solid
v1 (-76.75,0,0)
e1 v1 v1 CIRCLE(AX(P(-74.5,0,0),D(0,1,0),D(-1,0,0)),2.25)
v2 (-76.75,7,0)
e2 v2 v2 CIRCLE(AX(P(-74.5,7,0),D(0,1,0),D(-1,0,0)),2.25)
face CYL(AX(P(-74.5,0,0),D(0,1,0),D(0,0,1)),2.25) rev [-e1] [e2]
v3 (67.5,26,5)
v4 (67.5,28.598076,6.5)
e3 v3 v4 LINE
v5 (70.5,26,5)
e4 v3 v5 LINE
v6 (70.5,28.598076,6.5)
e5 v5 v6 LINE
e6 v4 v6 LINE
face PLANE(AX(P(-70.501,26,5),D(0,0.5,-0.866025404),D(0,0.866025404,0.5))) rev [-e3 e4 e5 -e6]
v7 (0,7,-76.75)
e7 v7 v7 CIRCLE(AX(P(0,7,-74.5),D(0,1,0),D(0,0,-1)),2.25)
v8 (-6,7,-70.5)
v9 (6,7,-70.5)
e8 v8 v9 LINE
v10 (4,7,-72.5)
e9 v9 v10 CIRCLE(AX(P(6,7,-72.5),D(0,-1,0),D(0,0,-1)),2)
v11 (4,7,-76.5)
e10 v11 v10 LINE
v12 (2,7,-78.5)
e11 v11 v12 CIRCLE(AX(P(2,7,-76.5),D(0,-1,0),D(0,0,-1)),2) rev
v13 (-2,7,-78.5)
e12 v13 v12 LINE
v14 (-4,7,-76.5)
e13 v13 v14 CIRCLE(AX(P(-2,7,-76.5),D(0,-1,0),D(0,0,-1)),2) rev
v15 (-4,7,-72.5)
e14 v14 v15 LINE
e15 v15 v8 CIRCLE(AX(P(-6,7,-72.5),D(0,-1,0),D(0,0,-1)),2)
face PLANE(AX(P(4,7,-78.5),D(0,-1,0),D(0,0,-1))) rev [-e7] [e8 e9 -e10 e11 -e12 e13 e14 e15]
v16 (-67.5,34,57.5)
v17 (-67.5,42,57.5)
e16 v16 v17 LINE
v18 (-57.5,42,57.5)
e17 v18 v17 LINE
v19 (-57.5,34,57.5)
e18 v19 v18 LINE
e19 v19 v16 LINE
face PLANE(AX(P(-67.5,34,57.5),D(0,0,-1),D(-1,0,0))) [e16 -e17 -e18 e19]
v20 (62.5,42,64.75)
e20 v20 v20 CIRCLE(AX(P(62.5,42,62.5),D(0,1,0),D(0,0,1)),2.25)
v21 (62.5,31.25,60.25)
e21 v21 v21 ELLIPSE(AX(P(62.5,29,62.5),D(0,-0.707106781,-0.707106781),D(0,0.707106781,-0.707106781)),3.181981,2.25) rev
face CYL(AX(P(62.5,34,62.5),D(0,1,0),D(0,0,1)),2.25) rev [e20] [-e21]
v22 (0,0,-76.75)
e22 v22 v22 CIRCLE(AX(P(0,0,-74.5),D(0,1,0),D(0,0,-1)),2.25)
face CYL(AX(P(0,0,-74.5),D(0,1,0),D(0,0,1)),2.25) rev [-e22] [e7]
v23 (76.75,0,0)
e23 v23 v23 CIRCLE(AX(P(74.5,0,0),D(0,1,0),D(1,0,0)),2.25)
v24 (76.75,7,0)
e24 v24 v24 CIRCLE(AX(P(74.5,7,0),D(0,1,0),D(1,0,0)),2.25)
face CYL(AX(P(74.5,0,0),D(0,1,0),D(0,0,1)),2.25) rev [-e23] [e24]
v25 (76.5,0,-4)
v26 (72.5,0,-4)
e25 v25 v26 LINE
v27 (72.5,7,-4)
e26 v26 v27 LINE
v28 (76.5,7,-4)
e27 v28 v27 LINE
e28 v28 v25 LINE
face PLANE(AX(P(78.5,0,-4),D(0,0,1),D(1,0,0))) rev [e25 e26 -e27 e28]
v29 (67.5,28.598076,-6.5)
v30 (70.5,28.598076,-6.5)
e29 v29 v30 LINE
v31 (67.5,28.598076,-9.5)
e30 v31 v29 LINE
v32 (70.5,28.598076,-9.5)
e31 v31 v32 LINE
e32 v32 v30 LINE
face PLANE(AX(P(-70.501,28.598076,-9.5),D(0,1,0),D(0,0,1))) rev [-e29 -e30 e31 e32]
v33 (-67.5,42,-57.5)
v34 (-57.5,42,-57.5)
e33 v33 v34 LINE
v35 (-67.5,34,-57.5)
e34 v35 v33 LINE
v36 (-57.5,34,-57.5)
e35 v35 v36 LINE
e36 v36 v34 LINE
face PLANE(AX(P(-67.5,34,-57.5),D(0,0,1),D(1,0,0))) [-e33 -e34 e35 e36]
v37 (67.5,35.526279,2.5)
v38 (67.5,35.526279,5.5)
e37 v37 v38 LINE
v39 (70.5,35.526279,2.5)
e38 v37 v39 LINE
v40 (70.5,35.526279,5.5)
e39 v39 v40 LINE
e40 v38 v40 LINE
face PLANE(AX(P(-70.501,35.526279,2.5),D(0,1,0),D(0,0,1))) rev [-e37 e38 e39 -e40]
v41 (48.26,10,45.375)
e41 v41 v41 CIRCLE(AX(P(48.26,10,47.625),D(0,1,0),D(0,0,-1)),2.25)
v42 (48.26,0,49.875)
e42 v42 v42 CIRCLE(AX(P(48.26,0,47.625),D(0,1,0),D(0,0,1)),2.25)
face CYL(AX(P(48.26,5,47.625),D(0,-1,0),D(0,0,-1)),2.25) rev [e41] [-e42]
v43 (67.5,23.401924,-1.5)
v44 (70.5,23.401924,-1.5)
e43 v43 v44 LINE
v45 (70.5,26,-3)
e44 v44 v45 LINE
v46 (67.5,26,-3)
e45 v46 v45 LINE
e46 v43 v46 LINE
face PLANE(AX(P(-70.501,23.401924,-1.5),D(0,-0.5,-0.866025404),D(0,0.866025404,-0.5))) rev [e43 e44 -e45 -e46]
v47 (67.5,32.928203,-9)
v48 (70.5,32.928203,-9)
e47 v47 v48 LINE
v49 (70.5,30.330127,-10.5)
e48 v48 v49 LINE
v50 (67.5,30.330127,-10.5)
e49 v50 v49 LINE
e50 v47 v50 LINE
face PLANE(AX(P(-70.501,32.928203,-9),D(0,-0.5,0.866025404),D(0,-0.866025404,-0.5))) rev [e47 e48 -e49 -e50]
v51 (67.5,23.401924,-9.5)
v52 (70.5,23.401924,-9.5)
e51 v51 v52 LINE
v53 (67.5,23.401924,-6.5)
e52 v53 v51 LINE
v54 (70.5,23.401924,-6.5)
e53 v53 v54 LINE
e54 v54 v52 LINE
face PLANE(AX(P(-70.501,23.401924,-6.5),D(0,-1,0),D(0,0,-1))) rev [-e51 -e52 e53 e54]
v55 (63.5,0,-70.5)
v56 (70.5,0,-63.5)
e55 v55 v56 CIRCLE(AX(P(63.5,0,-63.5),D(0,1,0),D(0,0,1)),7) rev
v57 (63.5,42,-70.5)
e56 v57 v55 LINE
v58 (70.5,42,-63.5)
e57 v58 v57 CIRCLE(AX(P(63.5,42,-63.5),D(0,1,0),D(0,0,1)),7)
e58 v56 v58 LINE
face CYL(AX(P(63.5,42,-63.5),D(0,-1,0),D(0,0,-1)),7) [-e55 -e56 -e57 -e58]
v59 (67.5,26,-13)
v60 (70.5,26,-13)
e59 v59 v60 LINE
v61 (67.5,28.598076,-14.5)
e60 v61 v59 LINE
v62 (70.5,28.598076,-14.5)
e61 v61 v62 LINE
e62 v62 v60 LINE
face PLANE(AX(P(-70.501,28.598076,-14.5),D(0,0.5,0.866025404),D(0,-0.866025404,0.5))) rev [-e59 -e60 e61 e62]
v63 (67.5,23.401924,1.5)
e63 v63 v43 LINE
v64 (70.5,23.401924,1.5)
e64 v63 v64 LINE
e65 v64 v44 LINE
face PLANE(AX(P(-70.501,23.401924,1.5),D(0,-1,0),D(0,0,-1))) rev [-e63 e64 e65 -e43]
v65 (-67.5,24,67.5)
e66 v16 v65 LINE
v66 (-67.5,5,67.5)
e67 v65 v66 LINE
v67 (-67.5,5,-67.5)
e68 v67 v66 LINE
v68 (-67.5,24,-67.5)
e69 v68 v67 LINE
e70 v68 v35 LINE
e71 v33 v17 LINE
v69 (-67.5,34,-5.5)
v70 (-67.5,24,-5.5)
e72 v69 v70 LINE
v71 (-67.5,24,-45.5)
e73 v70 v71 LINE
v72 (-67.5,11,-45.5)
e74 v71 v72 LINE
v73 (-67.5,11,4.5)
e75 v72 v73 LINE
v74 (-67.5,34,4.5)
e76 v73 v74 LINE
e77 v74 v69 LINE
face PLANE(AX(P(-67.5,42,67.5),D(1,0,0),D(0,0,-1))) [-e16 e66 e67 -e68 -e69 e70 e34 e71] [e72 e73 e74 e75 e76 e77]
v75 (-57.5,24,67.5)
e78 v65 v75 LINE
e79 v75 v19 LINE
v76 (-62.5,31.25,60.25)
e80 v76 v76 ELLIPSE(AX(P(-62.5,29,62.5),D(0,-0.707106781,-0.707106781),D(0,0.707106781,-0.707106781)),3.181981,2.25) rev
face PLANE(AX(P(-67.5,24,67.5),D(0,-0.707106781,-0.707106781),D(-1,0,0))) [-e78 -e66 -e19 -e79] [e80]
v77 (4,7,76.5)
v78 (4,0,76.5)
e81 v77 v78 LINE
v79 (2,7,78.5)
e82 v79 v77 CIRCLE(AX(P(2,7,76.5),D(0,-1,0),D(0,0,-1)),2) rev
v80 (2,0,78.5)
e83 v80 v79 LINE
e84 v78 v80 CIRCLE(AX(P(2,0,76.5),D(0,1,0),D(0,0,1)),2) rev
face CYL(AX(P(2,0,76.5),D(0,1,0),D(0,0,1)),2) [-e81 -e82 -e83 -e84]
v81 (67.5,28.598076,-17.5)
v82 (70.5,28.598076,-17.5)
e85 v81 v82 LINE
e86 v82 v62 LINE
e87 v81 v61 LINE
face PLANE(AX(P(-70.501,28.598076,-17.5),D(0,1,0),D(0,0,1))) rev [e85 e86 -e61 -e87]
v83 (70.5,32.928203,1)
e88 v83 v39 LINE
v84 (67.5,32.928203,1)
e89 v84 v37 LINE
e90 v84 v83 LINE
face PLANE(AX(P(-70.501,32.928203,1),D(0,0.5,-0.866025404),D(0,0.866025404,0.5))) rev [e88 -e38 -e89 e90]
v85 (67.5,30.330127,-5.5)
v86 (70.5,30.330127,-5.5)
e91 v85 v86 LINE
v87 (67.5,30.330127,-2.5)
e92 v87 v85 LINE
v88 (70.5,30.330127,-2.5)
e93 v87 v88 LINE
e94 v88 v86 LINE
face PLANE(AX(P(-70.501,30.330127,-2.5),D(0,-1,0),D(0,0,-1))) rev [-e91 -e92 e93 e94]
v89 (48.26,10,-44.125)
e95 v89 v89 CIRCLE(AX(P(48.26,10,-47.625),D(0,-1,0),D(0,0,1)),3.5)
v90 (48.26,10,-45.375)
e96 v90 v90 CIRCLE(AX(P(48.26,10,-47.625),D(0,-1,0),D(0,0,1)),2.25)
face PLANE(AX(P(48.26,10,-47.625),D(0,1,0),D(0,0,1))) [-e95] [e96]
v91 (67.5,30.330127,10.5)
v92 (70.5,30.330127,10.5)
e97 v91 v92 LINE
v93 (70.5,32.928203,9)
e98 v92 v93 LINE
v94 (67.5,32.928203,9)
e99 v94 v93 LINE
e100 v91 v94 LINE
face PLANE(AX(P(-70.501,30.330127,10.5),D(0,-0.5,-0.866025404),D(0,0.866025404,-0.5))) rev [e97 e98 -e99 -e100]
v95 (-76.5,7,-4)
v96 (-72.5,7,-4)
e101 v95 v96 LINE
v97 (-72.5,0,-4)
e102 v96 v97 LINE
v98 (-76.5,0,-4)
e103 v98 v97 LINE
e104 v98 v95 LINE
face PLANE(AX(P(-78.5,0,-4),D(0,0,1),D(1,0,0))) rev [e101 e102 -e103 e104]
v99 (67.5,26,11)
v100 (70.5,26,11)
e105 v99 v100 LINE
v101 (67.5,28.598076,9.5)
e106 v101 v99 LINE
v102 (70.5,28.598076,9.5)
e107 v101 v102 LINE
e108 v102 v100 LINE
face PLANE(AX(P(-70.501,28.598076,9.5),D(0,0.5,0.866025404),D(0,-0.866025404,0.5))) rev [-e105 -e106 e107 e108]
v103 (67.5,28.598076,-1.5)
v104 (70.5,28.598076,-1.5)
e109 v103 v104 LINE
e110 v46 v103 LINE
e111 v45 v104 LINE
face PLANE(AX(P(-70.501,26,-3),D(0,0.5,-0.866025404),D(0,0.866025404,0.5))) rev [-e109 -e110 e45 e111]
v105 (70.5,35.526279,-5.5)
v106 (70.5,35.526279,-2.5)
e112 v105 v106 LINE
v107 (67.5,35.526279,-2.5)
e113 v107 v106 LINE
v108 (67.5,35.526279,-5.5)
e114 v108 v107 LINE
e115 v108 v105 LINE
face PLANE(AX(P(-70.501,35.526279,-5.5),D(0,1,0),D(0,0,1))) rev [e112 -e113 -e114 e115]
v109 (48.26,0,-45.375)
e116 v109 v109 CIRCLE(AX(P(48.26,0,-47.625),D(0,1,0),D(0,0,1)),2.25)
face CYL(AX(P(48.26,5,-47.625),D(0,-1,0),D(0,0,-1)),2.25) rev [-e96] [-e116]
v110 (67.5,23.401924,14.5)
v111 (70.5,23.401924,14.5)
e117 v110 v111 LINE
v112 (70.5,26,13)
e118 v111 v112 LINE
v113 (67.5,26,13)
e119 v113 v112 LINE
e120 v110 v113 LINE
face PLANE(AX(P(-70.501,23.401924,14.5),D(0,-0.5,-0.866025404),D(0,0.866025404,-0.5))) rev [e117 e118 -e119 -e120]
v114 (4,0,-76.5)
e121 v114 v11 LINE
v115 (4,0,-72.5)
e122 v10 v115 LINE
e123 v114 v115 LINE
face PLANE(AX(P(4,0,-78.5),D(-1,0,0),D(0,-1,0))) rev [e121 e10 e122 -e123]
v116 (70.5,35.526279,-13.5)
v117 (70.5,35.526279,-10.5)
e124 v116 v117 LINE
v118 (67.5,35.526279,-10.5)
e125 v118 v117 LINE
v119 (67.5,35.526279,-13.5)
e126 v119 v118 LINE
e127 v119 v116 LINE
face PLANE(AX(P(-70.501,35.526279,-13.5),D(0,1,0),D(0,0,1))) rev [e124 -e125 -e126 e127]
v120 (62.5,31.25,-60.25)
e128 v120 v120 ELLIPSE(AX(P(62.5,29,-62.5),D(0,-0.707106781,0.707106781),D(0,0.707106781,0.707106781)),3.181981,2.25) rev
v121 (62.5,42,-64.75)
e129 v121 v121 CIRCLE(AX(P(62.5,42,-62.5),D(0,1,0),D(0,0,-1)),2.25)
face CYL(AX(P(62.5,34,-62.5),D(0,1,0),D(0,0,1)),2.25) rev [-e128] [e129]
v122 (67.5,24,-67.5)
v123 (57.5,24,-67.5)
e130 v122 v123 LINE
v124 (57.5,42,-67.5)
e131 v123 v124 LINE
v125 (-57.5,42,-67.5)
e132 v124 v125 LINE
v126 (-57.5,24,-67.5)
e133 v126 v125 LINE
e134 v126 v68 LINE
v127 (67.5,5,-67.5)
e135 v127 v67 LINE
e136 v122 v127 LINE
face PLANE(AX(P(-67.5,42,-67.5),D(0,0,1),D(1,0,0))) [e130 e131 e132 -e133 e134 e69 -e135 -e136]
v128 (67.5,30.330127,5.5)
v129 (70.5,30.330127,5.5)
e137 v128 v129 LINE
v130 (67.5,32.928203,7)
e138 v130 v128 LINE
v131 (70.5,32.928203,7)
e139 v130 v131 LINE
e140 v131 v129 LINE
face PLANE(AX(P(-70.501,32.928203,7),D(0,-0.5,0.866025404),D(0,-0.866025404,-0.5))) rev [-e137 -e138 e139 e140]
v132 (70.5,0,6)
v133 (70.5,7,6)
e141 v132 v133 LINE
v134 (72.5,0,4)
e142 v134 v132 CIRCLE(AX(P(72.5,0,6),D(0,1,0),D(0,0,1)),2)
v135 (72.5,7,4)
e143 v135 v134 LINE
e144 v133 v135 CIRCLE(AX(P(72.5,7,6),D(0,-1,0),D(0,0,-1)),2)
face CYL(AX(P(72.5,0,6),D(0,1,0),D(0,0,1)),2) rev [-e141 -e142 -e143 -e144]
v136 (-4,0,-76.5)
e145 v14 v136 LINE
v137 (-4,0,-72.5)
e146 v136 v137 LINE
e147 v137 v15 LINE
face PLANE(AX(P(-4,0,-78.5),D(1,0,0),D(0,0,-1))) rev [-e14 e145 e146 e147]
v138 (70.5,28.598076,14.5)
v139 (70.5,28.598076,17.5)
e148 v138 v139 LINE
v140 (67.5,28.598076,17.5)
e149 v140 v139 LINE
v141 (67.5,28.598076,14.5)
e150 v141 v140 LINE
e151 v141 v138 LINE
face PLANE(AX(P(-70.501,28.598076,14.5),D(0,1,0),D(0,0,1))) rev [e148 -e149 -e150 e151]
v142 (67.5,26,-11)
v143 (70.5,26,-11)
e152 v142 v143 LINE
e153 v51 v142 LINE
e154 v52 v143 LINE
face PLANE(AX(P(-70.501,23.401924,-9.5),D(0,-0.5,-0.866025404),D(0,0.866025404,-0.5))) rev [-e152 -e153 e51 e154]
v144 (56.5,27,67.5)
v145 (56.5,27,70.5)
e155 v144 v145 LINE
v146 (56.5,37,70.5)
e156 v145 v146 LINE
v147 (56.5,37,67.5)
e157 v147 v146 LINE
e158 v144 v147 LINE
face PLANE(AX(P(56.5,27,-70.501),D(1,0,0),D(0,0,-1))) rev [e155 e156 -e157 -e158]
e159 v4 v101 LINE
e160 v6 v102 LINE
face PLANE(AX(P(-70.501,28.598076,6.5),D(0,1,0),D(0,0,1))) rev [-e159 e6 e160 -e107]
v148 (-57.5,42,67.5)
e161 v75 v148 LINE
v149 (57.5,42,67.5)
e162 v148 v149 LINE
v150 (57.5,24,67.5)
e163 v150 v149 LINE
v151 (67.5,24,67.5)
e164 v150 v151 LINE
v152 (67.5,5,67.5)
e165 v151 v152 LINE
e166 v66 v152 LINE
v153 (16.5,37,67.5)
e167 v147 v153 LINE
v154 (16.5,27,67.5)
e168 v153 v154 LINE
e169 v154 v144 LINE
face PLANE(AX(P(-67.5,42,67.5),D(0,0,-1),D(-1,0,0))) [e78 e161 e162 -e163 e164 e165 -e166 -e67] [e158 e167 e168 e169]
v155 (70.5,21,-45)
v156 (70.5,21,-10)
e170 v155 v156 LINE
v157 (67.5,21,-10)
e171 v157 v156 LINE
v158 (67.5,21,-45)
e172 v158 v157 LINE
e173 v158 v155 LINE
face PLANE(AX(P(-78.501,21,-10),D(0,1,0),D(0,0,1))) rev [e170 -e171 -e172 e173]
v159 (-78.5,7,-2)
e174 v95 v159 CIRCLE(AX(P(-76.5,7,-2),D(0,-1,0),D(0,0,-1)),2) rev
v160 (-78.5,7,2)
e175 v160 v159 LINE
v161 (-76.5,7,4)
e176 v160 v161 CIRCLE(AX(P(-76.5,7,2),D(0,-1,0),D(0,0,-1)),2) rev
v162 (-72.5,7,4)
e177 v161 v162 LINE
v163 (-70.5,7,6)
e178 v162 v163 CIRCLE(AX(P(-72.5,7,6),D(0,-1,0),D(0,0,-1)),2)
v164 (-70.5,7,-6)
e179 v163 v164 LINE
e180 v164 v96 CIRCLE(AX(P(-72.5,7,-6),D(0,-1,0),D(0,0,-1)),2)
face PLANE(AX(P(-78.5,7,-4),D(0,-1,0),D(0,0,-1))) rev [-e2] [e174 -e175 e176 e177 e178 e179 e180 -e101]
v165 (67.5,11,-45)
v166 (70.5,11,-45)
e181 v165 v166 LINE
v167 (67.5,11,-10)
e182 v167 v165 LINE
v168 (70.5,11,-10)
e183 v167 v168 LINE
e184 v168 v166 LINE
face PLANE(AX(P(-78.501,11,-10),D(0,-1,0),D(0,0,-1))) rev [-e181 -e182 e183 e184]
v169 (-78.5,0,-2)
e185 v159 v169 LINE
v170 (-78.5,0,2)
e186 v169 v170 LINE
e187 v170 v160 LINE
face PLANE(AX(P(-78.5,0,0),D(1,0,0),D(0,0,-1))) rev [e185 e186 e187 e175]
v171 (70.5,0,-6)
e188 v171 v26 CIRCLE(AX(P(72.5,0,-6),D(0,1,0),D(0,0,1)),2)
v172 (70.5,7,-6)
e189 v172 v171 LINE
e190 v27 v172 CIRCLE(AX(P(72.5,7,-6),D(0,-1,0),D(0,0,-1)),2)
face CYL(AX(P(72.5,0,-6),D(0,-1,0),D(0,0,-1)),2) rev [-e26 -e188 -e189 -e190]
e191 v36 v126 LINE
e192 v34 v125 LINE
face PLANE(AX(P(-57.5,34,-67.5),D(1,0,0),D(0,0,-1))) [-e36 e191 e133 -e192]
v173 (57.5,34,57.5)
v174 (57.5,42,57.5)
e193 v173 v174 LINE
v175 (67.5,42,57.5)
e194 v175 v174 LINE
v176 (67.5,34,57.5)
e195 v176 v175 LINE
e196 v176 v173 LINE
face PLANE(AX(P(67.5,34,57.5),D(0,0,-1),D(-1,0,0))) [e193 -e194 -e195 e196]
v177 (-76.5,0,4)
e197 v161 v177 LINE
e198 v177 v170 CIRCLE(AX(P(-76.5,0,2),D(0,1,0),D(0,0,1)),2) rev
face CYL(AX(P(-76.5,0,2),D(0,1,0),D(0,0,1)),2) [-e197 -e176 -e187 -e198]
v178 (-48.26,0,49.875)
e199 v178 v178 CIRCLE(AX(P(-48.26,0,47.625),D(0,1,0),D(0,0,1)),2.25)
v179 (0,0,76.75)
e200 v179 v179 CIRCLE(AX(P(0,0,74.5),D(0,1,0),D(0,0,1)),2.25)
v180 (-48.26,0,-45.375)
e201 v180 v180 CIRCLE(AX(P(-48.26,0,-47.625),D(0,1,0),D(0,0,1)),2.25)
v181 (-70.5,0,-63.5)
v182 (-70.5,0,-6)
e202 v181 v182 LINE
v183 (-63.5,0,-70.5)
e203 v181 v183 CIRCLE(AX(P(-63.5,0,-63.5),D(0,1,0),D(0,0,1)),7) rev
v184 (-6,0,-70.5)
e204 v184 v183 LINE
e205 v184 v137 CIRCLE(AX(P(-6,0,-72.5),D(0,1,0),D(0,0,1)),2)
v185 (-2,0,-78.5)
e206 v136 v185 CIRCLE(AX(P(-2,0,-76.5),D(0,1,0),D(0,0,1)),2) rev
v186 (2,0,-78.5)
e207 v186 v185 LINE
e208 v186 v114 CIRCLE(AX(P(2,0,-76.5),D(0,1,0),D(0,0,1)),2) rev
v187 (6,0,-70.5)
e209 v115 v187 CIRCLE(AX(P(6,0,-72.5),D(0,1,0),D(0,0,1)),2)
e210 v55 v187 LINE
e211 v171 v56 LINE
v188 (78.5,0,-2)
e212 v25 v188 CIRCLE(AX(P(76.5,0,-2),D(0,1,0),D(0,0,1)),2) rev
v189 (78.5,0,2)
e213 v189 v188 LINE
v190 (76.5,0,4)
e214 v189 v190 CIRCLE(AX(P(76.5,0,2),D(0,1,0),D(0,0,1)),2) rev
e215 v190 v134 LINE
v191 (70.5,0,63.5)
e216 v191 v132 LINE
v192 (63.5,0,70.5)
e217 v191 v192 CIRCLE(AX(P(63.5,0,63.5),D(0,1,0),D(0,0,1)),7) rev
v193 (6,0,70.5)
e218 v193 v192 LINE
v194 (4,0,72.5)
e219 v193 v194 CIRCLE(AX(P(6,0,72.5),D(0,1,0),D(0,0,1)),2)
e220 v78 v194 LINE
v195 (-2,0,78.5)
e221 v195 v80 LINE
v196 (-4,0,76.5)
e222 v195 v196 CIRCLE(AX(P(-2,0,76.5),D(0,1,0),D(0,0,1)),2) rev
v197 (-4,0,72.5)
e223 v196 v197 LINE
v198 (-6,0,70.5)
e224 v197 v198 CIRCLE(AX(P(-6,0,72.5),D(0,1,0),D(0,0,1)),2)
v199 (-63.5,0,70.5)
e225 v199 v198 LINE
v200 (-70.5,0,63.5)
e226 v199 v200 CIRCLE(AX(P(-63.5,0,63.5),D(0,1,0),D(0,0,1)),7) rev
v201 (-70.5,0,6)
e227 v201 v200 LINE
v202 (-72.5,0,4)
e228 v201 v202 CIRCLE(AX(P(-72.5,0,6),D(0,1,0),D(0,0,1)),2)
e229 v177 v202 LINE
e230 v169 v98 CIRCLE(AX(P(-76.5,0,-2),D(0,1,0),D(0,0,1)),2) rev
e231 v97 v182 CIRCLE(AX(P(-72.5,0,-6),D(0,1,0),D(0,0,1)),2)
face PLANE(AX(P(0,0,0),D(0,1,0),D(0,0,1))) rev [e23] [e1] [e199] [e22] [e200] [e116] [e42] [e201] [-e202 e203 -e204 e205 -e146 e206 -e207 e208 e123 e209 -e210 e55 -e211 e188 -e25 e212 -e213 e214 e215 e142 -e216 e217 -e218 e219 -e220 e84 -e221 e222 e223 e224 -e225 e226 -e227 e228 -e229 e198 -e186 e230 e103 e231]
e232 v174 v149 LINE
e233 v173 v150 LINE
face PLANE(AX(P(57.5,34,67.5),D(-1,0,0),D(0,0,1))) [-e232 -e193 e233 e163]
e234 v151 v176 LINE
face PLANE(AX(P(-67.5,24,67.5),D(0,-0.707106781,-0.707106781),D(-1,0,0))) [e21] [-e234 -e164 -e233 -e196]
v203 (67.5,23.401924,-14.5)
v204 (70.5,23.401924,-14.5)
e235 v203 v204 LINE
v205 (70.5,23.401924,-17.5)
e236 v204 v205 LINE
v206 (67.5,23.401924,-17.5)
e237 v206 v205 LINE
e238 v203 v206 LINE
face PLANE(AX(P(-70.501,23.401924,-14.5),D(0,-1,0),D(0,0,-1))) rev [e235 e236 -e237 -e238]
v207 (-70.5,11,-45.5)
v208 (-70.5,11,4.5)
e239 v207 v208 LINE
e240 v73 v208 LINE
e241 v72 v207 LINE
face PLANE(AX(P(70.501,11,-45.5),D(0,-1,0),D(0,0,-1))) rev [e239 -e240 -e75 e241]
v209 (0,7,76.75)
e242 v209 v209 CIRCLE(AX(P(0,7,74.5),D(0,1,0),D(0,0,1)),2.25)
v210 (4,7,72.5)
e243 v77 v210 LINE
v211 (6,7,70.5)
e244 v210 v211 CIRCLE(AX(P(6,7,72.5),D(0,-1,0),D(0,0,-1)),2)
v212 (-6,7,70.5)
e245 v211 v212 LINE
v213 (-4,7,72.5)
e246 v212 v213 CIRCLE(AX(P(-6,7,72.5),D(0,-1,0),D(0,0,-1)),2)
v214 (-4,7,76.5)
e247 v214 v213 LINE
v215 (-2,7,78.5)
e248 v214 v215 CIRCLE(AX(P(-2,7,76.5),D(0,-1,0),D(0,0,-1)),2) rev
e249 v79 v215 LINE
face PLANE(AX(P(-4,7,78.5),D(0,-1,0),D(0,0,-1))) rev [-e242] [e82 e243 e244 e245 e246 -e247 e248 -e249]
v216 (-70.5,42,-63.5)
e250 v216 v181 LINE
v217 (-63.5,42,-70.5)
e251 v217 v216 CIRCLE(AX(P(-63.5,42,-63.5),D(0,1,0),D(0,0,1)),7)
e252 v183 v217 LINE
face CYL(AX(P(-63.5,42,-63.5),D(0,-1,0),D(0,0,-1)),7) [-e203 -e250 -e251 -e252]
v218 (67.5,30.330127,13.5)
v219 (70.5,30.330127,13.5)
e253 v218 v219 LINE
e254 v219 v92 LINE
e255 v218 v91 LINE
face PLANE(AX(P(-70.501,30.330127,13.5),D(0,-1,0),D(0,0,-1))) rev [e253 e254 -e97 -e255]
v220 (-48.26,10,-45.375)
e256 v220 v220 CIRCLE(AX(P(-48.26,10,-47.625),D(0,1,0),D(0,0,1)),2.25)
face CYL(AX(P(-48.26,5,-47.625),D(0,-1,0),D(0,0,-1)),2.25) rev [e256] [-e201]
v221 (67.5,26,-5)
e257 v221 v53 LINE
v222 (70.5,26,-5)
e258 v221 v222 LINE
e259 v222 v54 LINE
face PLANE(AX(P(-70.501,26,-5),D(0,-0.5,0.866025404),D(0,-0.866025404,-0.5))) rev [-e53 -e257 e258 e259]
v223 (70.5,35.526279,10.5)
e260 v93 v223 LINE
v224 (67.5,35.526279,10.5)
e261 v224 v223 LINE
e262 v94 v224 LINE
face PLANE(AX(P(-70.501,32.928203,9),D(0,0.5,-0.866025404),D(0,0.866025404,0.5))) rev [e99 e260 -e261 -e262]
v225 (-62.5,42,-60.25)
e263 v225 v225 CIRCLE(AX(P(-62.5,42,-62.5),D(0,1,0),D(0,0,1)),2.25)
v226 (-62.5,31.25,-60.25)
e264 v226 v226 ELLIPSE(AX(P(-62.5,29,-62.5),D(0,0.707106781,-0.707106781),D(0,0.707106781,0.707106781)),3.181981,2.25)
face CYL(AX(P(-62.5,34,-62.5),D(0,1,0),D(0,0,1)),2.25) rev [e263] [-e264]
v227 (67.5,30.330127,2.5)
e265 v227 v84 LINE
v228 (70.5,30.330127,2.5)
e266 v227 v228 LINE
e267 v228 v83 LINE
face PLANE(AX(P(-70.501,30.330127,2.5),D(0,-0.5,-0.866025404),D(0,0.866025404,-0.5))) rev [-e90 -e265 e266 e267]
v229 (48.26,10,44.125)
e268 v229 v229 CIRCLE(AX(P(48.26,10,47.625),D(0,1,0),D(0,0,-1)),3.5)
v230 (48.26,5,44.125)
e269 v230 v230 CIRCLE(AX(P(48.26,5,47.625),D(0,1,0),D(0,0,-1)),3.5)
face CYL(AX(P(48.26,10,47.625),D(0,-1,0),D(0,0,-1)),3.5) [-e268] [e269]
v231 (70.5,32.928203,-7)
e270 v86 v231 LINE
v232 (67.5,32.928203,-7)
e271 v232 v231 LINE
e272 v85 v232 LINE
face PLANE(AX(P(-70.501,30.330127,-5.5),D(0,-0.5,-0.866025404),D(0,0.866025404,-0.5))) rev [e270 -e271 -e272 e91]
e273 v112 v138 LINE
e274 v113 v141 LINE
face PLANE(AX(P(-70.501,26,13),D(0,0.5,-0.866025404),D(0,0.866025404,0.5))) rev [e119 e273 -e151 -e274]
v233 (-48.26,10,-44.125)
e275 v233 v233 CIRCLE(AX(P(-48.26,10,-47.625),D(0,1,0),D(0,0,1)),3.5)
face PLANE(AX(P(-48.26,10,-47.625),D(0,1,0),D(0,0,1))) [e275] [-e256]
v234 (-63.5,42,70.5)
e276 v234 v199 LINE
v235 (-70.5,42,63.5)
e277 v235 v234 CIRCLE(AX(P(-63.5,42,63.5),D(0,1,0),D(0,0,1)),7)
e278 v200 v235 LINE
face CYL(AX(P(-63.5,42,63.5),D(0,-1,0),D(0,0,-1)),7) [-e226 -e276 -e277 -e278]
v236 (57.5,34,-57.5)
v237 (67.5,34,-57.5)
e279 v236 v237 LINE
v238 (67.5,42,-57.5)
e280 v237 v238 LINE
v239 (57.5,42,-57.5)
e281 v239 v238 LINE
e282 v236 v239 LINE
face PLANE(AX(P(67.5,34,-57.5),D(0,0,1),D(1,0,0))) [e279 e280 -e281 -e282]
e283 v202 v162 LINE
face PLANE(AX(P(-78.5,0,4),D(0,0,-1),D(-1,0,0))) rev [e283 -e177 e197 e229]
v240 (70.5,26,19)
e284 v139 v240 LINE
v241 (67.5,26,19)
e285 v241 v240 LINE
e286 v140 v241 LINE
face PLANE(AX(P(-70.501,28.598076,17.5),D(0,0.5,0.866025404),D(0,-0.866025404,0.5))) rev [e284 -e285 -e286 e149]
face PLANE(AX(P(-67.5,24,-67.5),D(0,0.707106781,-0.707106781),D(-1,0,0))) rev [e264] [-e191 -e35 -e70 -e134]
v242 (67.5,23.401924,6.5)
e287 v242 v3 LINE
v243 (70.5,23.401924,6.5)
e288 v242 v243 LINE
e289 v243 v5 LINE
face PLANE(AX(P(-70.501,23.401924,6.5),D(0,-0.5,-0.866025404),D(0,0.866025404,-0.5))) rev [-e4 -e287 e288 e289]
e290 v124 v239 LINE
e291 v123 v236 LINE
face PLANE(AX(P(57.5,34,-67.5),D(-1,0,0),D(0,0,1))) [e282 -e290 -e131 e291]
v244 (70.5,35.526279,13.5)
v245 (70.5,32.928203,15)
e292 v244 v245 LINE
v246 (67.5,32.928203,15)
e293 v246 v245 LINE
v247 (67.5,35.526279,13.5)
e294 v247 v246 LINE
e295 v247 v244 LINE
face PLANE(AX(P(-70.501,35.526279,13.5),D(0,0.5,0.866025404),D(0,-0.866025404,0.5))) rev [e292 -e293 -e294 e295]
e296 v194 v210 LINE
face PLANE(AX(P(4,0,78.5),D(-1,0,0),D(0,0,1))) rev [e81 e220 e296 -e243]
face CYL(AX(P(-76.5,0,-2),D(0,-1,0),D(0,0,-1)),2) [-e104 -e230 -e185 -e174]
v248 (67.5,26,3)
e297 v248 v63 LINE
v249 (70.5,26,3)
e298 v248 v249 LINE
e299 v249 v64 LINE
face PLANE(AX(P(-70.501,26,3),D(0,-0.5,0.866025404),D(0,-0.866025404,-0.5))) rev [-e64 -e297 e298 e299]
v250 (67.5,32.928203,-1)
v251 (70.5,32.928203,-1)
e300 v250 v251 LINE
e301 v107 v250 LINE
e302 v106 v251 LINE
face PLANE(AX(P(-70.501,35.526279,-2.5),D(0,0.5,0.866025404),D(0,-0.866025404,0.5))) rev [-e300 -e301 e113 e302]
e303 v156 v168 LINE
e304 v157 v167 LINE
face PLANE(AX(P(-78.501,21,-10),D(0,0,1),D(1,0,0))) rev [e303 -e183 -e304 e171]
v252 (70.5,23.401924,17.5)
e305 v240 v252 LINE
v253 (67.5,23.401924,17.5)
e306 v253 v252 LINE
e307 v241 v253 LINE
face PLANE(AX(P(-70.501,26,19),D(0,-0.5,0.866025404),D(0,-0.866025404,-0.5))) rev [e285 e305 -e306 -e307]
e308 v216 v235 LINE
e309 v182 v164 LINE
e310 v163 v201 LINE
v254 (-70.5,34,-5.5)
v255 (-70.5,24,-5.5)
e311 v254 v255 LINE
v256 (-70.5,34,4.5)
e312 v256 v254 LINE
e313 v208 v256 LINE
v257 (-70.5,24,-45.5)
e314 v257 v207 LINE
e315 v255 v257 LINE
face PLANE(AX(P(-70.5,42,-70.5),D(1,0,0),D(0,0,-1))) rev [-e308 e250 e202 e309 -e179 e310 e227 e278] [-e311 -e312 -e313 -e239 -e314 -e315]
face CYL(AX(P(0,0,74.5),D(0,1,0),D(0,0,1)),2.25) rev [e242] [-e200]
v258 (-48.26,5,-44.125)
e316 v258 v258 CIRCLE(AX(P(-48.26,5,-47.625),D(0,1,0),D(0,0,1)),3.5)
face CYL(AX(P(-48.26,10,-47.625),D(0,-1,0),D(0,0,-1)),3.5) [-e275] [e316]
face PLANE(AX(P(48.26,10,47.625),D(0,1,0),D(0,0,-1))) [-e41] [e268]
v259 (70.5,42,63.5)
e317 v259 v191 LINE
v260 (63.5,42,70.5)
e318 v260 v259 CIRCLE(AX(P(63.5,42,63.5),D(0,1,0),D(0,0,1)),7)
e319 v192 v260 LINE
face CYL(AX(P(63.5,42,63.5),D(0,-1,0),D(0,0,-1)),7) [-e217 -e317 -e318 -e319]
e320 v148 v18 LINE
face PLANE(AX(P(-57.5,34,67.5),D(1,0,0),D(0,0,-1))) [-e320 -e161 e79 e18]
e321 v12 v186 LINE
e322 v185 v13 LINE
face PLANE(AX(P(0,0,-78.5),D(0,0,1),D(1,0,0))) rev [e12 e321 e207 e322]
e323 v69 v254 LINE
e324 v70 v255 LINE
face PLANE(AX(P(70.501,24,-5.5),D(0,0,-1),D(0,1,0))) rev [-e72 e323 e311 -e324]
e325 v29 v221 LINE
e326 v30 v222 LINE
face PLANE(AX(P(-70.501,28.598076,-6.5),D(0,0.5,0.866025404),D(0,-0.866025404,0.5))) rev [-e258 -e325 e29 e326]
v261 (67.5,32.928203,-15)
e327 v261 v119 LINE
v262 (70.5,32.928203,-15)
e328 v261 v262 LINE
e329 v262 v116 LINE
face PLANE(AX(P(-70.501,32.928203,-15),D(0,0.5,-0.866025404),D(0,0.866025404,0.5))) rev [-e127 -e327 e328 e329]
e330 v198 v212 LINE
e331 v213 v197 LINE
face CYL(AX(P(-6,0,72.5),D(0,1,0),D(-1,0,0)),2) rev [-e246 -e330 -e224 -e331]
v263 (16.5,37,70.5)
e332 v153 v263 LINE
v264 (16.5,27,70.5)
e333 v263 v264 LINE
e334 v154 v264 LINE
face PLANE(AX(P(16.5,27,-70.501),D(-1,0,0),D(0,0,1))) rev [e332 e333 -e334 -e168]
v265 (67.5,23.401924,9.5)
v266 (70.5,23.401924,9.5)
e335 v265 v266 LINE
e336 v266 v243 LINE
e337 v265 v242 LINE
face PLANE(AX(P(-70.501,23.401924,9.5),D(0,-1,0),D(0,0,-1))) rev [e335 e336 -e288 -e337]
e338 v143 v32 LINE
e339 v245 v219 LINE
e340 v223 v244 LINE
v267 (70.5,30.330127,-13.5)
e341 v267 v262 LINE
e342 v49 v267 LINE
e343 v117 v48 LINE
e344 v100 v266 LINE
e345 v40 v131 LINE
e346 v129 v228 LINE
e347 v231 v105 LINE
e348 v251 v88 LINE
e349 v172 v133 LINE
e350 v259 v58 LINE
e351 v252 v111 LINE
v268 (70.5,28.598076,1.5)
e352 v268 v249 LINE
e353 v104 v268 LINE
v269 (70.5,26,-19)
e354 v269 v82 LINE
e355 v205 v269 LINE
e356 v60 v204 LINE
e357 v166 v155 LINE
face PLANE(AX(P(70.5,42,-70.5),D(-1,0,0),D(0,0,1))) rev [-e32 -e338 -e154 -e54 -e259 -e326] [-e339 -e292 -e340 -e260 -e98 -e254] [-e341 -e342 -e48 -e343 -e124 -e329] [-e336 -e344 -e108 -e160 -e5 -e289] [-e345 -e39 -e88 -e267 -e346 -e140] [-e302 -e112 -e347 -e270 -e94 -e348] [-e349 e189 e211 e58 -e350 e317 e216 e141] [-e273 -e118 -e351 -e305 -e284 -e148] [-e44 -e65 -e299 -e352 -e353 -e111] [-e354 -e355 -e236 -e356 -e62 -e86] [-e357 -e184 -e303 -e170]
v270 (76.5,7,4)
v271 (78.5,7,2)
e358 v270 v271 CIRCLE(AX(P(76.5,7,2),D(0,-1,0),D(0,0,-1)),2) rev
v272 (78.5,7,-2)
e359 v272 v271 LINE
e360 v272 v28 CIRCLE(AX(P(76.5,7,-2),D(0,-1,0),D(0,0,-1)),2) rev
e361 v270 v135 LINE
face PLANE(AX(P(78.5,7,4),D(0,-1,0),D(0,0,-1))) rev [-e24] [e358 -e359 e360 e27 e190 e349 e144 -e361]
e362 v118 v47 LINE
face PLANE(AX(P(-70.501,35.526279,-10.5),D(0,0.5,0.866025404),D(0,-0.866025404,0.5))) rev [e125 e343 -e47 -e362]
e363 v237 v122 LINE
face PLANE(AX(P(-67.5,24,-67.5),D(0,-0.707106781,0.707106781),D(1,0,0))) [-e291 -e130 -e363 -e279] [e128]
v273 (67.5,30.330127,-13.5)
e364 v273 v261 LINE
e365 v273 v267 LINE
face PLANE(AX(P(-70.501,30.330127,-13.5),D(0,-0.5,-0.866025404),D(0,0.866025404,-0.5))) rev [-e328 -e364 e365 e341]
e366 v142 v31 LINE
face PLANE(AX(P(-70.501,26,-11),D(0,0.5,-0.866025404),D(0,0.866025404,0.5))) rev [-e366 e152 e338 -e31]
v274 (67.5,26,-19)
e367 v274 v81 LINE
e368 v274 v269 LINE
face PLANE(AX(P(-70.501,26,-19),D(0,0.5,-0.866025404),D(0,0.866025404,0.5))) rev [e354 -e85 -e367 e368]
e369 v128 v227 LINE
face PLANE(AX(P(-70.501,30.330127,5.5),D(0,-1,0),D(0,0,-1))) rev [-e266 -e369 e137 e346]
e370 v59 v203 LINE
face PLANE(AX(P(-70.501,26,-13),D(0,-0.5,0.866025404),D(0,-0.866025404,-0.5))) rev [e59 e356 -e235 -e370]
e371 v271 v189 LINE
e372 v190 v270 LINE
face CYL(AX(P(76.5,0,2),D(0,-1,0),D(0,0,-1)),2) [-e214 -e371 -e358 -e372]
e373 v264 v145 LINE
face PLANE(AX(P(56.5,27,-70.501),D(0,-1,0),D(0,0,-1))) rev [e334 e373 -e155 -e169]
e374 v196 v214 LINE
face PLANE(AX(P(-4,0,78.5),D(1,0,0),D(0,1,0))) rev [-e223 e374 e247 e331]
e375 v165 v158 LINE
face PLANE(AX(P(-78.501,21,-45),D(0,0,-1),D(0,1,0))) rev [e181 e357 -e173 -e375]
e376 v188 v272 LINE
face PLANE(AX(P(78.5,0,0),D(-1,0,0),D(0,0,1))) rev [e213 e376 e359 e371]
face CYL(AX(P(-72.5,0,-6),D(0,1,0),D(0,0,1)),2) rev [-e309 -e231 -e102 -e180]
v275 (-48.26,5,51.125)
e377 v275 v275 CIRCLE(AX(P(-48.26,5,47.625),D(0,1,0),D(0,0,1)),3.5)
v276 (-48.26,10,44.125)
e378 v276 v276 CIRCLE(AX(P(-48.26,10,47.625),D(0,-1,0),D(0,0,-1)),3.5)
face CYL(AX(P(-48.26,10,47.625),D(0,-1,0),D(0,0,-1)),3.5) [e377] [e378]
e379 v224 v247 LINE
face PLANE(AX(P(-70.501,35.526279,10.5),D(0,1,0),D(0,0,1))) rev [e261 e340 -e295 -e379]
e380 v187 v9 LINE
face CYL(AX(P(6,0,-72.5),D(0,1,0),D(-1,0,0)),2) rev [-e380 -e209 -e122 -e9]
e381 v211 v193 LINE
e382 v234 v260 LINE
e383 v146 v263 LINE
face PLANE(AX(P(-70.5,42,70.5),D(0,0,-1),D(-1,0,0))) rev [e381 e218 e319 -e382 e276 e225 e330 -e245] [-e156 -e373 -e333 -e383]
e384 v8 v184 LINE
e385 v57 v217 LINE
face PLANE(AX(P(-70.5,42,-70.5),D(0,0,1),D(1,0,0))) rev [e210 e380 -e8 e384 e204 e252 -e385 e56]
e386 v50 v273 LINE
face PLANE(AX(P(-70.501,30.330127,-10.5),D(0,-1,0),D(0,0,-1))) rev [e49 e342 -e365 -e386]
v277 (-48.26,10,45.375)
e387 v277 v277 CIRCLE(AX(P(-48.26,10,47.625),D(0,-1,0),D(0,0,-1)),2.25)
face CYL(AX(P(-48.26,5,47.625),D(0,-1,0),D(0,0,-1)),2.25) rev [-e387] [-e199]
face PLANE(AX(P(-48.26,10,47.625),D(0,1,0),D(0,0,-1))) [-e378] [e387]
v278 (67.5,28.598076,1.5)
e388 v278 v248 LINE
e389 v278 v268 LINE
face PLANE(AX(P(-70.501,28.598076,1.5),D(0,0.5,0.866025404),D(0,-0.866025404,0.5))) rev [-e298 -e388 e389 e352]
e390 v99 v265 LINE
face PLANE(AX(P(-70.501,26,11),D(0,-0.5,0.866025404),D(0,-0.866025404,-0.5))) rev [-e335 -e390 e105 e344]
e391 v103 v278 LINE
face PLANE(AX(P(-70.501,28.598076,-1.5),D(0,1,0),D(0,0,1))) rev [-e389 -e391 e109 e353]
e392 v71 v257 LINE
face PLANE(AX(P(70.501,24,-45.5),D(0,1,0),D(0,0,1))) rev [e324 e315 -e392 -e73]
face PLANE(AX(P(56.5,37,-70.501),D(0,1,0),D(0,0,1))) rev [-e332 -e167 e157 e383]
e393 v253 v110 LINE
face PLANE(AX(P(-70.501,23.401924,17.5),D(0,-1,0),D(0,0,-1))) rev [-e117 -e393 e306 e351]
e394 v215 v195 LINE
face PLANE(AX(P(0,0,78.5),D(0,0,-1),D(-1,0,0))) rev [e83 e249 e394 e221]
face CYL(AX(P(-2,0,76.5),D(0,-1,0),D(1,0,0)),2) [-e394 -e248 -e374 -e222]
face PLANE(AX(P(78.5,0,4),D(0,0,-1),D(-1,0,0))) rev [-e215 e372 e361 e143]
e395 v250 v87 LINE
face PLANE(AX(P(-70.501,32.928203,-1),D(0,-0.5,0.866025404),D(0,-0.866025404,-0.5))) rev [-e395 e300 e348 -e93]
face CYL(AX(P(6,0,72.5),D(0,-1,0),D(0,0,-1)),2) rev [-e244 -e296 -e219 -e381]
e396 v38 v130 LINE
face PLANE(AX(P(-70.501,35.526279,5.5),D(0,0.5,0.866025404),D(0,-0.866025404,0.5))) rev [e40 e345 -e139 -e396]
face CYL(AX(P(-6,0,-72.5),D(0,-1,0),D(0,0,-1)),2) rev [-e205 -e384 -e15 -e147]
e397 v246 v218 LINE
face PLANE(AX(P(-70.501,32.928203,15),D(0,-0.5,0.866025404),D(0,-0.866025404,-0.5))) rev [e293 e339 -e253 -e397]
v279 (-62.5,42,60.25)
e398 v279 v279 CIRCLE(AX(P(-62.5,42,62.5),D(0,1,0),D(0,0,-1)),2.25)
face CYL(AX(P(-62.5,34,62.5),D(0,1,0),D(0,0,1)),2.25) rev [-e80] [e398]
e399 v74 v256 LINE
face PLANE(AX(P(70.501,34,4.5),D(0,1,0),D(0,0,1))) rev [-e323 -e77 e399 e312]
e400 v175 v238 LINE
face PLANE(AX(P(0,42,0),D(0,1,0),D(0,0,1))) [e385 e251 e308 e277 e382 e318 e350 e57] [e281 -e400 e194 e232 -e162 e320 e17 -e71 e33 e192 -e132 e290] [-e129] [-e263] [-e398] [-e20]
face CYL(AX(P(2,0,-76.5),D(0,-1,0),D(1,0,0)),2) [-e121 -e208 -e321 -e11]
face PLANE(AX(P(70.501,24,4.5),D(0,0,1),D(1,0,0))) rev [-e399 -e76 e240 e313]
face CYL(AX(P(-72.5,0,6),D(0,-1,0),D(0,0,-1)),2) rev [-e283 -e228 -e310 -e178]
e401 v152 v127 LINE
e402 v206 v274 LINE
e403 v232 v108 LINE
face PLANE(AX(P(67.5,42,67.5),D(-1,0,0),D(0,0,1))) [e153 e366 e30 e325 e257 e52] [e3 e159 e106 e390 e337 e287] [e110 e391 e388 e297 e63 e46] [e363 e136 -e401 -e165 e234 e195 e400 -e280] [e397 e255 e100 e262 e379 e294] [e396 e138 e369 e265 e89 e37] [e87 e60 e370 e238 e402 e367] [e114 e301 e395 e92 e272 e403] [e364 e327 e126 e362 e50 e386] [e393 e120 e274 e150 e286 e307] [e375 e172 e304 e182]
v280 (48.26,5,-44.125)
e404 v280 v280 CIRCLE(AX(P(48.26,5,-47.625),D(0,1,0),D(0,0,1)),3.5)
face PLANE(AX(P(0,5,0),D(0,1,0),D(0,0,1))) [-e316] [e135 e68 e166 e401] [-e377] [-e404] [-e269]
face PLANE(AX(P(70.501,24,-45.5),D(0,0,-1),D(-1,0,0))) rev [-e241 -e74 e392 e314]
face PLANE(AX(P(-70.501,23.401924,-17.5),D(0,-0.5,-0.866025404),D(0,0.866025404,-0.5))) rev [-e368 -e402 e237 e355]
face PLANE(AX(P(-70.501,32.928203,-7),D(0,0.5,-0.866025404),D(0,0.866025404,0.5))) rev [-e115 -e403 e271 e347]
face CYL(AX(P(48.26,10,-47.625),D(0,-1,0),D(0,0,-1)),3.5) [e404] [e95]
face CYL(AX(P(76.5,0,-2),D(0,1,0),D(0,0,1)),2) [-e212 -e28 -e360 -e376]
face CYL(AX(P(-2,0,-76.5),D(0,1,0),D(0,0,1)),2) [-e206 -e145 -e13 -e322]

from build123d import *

# Parameters (mm, degrees)
SKETCH1_W                 = 135
SKETCH1_H                 = 135
SKETCH1_R                 = 2.25
BOSS_EXTRUDE1_DEPTH       = 5
SKETCH2_R                 = 3.5
SKETCH2_R_2               = 2.25
BOSS_EXTRUDE2_DEPTH       = 5
MIRROR2_COPY_1_SKETCH_R   = 3.5
MIRROR2_COPY_1_SKETCH_R_2 = 2.25
MIRROR2_COPY_1_DEPTH      = 5
SKETCH4_W                 = 141
SKETCH4_H                 = 141
SKETCH4_W_2               = 135
SKETCH4_H_2               = 135
BOSS_EXTRUDE3_DEPTH       = 42
CUT_EXTRUDE2_REACH        = 165.142
CUT_EXTRUDE3_REACH        = 165.142
SKETCH7_W                 = 40
SKETCH7_H                 = 10
CUT_EXTRUDE4_REACH        = 165.142
SKETCH9_W                 = 10
SKETCH9_H                 = 10
SKETCH9_R                 = 2.25
BOSS_EXTRUDE4_DEPTH       = 8
CHAMFER2_SIZE             = 10
SKETCH10_W                = 8
SKETCH10_H                = 7
BOSS_EXTRUDE5_DEPTH       = 8
SKETCH11_R                = 2.25
CUT_EXTRUDE5_DEPTH        = 112.164292828
CIRPATTERN1_COUNT         = 4
FILLET1_R                 = 2
CUT_EXTRUDE6_REACH        = 175.572
SKETCH12_W                = 35
SKETCH12_H                = 10
FILLET2_R                 = 7


with BuildPart() as part:
    # Sketch1 → Boss-Extrude1 (new body)
    with BuildSketch(Plane(origin=(0, 0, 0), x_dir=(1, 0, 0), z_dir=(0, 1, 0))):
        Rectangle(SKETCH1_W, SKETCH1_H)
        with Locations(Location((-48.26, 47.625, 0), (0, 0, 270))):
            Circle(SKETCH1_R, mode=Mode.SUBTRACT)
        with Locations(Location((48.26, 47.625, 0), (0, 0, 270))):
            Circle(SKETCH1_R, mode=Mode.SUBTRACT)
        with Locations(Location((48.26, -47.625, 0), (0, 0, 270))):
            Circle(SKETCH1_R, mode=Mode.SUBTRACT)
        with Locations(Location((-48.26, -47.625, 0), (0, 0, 270))):
            Circle(SKETCH1_R, mode=Mode.SUBTRACT)
    extrude(amount=BOSS_EXTRUDE1_DEPTH)

    # Sketch2 → Boss-Extrude2 (add)
    with BuildSketch(Plane(origin=(0, 5, 0), x_dir=(1, 0, 0), z_dir=(0, 1, 0))):
        with Locations(Location((-48.26, 47.625, 0), (0, 0, 270))):
            Circle(SKETCH2_R)
        with Locations(Location((-48.26, 47.625, 0), (0, 0, 270))):
            Circle(SKETCH2_R_2, mode=Mode.SUBTRACT)
    boss_extrude2 = extrude(amount=BOSS_EXTRUDE2_DEPTH)

    # Mirror1: Boss-Extrude2 across plane
    add(boss_extrude2.mirror(Plane.XY))

    # Mirror2: Boss-Extrude2 across plane
    add(boss_extrude2.mirror(Plane(origin=(0, 0, 0), x_dir=(0, 0, 1), z_dir=(1, 0, 0))))

    # Mirror2 copy 1 sketch → Mirror2 copy 1 (add)
    with BuildSketch(Plane(origin=(0, 5, 0), x_dir=(-1, 0, 0), z_dir=(0, 1, 0))):
        with Locations(Location((-48.26, 47.625, 0), (0, 0, 270))):
            Circle(MIRROR2_COPY_1_SKETCH_R)
        with Locations(Location((-48.26, 47.625, 0), (0, 0, 270))):
            Circle(MIRROR2_COPY_1_SKETCH_R_2, mode=Mode.SUBTRACT)
    extrude(amount=MIRROR2_COPY_1_DEPTH)

    # Sketch4 → Boss-Extrude3 (add)
    with BuildSketch(Plane(origin=(0, 0, 0), x_dir=(1, 0, 0), z_dir=(0, 1, 0))):
        Rectangle(SKETCH4_W, SKETCH4_H)
        Rectangle(SKETCH4_W_2, SKETCH4_H_2, mode=Mode.SUBTRACT)
    extrude(amount=BOSS_EXTRUDE3_DEPTH)

    # Sketch6 → Cut-Extrude2 (cut, up to next)
    with BuildSketch(Plane.ZY.offset(70.5), mode=Mode.PRIVATE) as cut_extrude2_sk1:
        Polygon((-45.5, 24), (-5.5, 24), (-5.5, 34), (4.5, 34), (4.5, 24), (4.5, 11), (-45.5, 11), align=None)
    cut_extrude2_tool1 = extrude(cut_extrude2_sk1.sketch, amount=-CUT_EXTRUDE2_REACH, mode=Mode.PRIVATE) & part.part
    add(cut_extrude2_tool1.solids().sort_by_distance((-70.5, 19.033333, -17.833333))[0], mode=Mode.SUBTRACT)

    # Sketch7 → Cut-Extrude3 (cut, up to next)
    with BuildSketch(Plane.XY.offset(70.5), mode=Mode.PRIVATE) as cut_extrude3_sk1:
        with Locations((36.5, 32)):
            Rectangle(SKETCH7_W, SKETCH7_H)
    cut_extrude3_tool1 = extrude(cut_extrude3_sk1.sketch, amount=-CUT_EXTRUDE3_REACH, mode=Mode.PRIVATE) & part.part
    add(cut_extrude3_tool1.solids().sort_by_distance((36.5, 32, 70.5))[0], mode=Mode.SUBTRACT)

    # Sketch8 → Cut-Extrude4 (cut, up to next)
    with BuildSketch(Plane(origin=(70.5, 0, 0), x_dir=(0, 0, -1), z_dir=(1, 0, 0)), mode=Mode.PRIVATE) as cut_extrude4_sk1:
        Polygon((-13, 26), (-14.5, 28.598076211), (-17.5, 28.598076211), (-19, 26), (-17.5, 23.401923789), (-14.5, 23.401923789), align=None)
    cut_extrude4_tool1 = extrude(cut_extrude4_sk1.sketch, amount=-CUT_EXTRUDE4_REACH, mode=Mode.PRIVATE) & part.part
    # Sketch8 → Cut-Extrude4 (cut, up to next)
    with BuildSketch(Plane(origin=(70.5, 0, 0), x_dir=(0, 0, -1), z_dir=(1, 0, 0)), mode=Mode.PRIVATE) as cut_extrude4_sk2:
        Polygon((-9.5, 28.598076211), (-11, 26), (-9.5, 23.401923789), (-6.5, 23.401923789), (-5, 26), (-6.5, 28.598076211), align=None)
    cut_extrude4_tool2 = extrude(cut_extrude4_sk2.sketch, amount=-CUT_EXTRUDE4_REACH, mode=Mode.PRIVATE) & part.part
    # Sketch8 → Cut-Extrude4 (cut, up to next)
    with BuildSketch(Plane(origin=(70.5, 0, 0), x_dir=(0, 0, -1), z_dir=(1, 0, 0)), mode=Mode.PRIVATE) as cut_extrude4_sk3:
        Polygon((-1.5, 28.598076211), (-3, 26), (-1.5, 23.401923789), (1.5, 23.401923789), (3, 26), (1.5, 28.598076211), align=None)
    cut_extrude4_tool3 = extrude(cut_extrude4_sk3.sketch, amount=-CUT_EXTRUDE4_REACH, mode=Mode.PRIVATE) & part.part
    # Sketch8 → Cut-Extrude4 (cut, up to next)
    with BuildSketch(Plane(origin=(70.5, 0, 0), x_dir=(0, 0, -1), z_dir=(1, 0, 0)), mode=Mode.PRIVATE) as cut_extrude4_sk4:
        Polygon((6.5, 28.598076211), (5, 26), (6.5, 23.401923789), (9.5, 23.401923789), (11, 26), (9.5, 28.598076211), align=None)
    cut_extrude4_tool4 = extrude(cut_extrude4_sk4.sketch, amount=-CUT_EXTRUDE4_REACH, mode=Mode.PRIVATE) & part.part
    # Sketch8 → Cut-Extrude4 (cut, up to next)
    with BuildSketch(Plane(origin=(70.5, 0, 0), x_dir=(0, 0, -1), z_dir=(1, 0, 0)), mode=Mode.PRIVATE) as cut_extrude4_sk5:
        Polygon((14.5, 28.598076211), (13, 26), (14.5, 23.401923789), (17.5, 23.401923789), (19, 26), (17.5, 28.598076211), align=None)
    cut_extrude4_tool5 = extrude(cut_extrude4_sk5.sketch, amount=-CUT_EXTRUDE4_REACH, mode=Mode.PRIVATE) & part.part
    # Sketch8 → Cut-Extrude4 (cut, up to next)
    with BuildSketch(Plane(origin=(70.5, 0, 0), x_dir=(0, 0, -1), z_dir=(1, 0, 0)), mode=Mode.PRIVATE) as cut_extrude4_sk6:
        Polygon((-5.5, 35.526279442), (-7, 32.92820323), (-5.5, 30.330127019), (-2.5, 30.330127019), (-1, 32.92820323), (-2.5, 35.526279442), align=None)
    cut_extrude4_tool6 = extrude(cut_extrude4_sk6.sketch, amount=-CUT_EXTRUDE4_REACH, mode=Mode.PRIVATE) & part.part
    # Sketch8 → Cut-Extrude4 (cut, up to next)
    with BuildSketch(Plane(origin=(70.5, 0, 0), x_dir=(0, 0, -1), z_dir=(1, 0, 0)), mode=Mode.PRIVATE) as cut_extrude4_sk7:
        Polygon((2.5, 35.526279442), (1, 32.92820323), (2.5, 30.330127019), (5.5, 30.330127019), (7, 32.92820323), (5.5, 35.526279442), align=None)
    cut_extrude4_tool7 = extrude(cut_extrude4_sk7.sketch, amount=-CUT_EXTRUDE4_REACH, mode=Mode.PRIVATE) & part.part
    # Sketch8 → Cut-Extrude4 (cut, up to next)
    with BuildSketch(Plane(origin=(70.5, 0, 0), x_dir=(0, 0, -1), z_dir=(1, 0, 0)), mode=Mode.PRIVATE) as cut_extrude4_sk8:
        Polygon((10.5, 35.526279442), (9, 32.92820323), (10.5, 30.330127019), (13.5, 30.330127019), (15, 32.92820323), (13.5, 35.526279442), align=None)
    cut_extrude4_tool8 = extrude(cut_extrude4_sk8.sketch, amount=-CUT_EXTRUDE4_REACH, mode=Mode.PRIVATE) & part.part
    # Sketch8 → Cut-Extrude4 (cut, up to next)
    with BuildSketch(Plane(origin=(70.5, 0, 0), x_dir=(0, 0, -1), z_dir=(1, 0, 0)), mode=Mode.PRIVATE) as cut_extrude4_sk9:
        Polygon((-13.5, 35.526279442), (-15, 32.92820323), (-13.5, 30.330127019), (-10.5, 30.330127019), (-9, 32.92820323), (-10.5, 35.526279442), align=None)
    cut_extrude4_tool9 = extrude(cut_extrude4_sk9.sketch, amount=-CUT_EXTRUDE4_REACH, mode=Mode.PRIVATE) & part.part
    add(cut_extrude4_tool1.solids().sort_by_distance((70.5, 26, 16))[0], mode=Mode.SUBTRACT)
    add(cut_extrude4_tool2.solids().sort_by_distance((70.5, 26, 8))[0], mode=Mode.SUBTRACT)
    add(cut_extrude4_tool3.solids().sort_by_distance((70.5, 26, 0))[0], mode=Mode.SUBTRACT)
    add(cut_extrude4_tool4.solids().sort_by_distance((70.5, 26, -8))[0], mode=Mode.SUBTRACT)
    add(cut_extrude4_tool5.solids().sort_by_distance((70.5, 26, -16))[0], mode=Mode.SUBTRACT)
    add(cut_extrude4_tool6.solids().sort_by_distance((70.5, 32.928203, 4))[0], mode=Mode.SUBTRACT)
    add(cut_extrude4_tool7.solids().sort_by_distance((70.5, 32.928203, -4))[0], mode=Mode.SUBTRACT)
    add(cut_extrude4_tool8.solids().sort_by_distance((70.5, 32.928203, -12))[0], mode=Mode.SUBTRACT)
    add(cut_extrude4_tool9.solids().sort_by_distance((70.5, 32.928203, 12))[0], mode=Mode.SUBTRACT)

    # Sketch9 → Boss-Extrude4 (add)
    # profile 1 of 4: a face of its own
    with BuildSketch(Plane(origin=(0, 42, 0), x_dir=(1, 0, 0), z_dir=(0, 1, 0))):
        with Locations((-62.5, 62.5)):
            Rectangle(SKETCH9_W, SKETCH9_H)
        with Locations(Location((-62.5, 62.5, 0), (0, 0, 270))):
            Circle(SKETCH9_R, mode=Mode.SUBTRACT)
    # profile 2 of 4: a face of its own
    with BuildSketch(Plane(origin=(0, 42, 0), x_dir=(1, 0, 0), z_dir=(0, 1, 0))):
        with Locations((-62.5, -62.5)):
            Rectangle(SKETCH9_W, SKETCH9_H)
        with Locations(Location((-62.5, -62.5, 0), (0, 0, 90))):
            Circle(SKETCH9_R, mode=Mode.SUBTRACT)
    # profile 3 of 4: a face of its own
    with BuildSketch(Plane(origin=(0, 42, 0), x_dir=(1, 0, 0), z_dir=(0, 1, 0))):
        with Locations((62.5, 62.5)):
            Rectangle(SKETCH9_W, SKETCH9_H)
        with Locations(Location((62.5, 62.5, 0), (0, 0, 90))):
            Circle(SKETCH9_R, mode=Mode.SUBTRACT)
    # profile 4 of 4: a face of its own
    with BuildSketch(Plane(origin=(0, 42, 0), x_dir=(1, 0, 0), z_dir=(0, 1, 0))):
        with Locations((62.5, -62.5)):
            Rectangle(SKETCH9_W, SKETCH9_H)
        with Locations(Location((62.5, -62.5, 0), (0, 0, 270))):
            Circle(SKETCH9_R, mode=Mode.SUBTRACT)
    extrude(amount=-BOSS_EXTRUDE4_DEPTH)

    # Chamfer2
    # the kernel refuses this chamfer: 10 mm, written as the material it adds along each edge
    with BuildSketch(Plane(origin=(-67.5, 34, -67.5), x_dir=(0, -0.9996219169112968, -0.027495876610586317), z_dir=(1, 0, 0))) as chamfer2_piece_1_section:
        Polygon((CHAMFER2_SIZE * 0.999621916911, -CHAMFER2_SIZE * 0.0274958766106), (-CHAMFER2_SIZE * 0.0274958766106, -CHAMFER2_SIZE * 0.999621916911), (0, 0), align=None)
    chamfer2_piece_1 = extrude(amount=10, mode=Mode.PRIVATE)
    chamfer2_piece_1 = chamfer2_piece_1 - Plane(origin=(-62.5, 25.719641091, -62.5), x_dir=(0, 0, 1), z_dir=(0, 1, 0)) * Cylinder(2.25, 60, mode=Mode.PRIVATE)
    add(chamfer2_piece_1)
    with BuildSketch(Plane(origin=(-67.5, 34, 67.5), x_dir=(0, -0.9996219169112968, 0.02749587661058908), z_dir=(1, 0, 0))) as chamfer2_piece_2_section:
        Polygon((CHAMFER2_SIZE * 0.999621916911, CHAMFER2_SIZE * 0.0274958766106), (-CHAMFER2_SIZE * 0.0274958766106, CHAMFER2_SIZE * 0.999621916911), (0, 0), align=None)
    chamfer2_piece_2 = extrude(amount=10, mode=Mode.PRIVATE)
    chamfer2_piece_2 = chamfer2_piece_2 - Plane(origin=(-62.5, 25.719641091, 62.5), x_dir=(0, 0, -1), z_dir=(0, 1, 0)) * Cylinder(2.25, 60, mode=Mode.PRIVATE)
    add(chamfer2_piece_2)
    with BuildSketch(Plane(origin=(57.5, 34, 67.5), x_dir=(0, -0.9996219169112968, 0.0274958766105877), z_dir=(1, 0, 0))) as chamfer2_piece_3_section:
        Polygon((CHAMFER2_SIZE * 0.999621916911, CHAMFER2_SIZE * 0.0274958766106), (-CHAMFER2_SIZE * 0.0274958766106, CHAMFER2_SIZE * 0.999621916911), (0, 0), align=None)
    chamfer2_piece_3 = extrude(amount=10, mode=Mode.PRIVATE)
    chamfer2_piece_3 = chamfer2_piece_3 - Plane(origin=(62.5, 25.999278789, 62.5), x_dir=(0, 0, 1), z_dir=(0, 1, 0)) * Cylinder(2.25, 60, mode=Mode.PRIVATE)
    add(chamfer2_piece_3)
    with BuildSketch(Plane(origin=(67.5, 34, -67.5), x_dir=(0, -0.9996219169112968, -0.0274958766105877), z_dir=(-1, 0, 0))) as chamfer2_piece_4_section:
        Polygon((CHAMFER2_SIZE * 0.999621916911, CHAMFER2_SIZE * 0.0274958766106), (-CHAMFER2_SIZE * 0.0274958766106, CHAMFER2_SIZE * 0.999621916911), (0, 0), align=None)
    chamfer2_piece_4 = extrude(amount=10, mode=Mode.PRIVATE)
    chamfer2_piece_4 = chamfer2_piece_4 - Plane(origin=(62.5, 25.719641091, -62.5), x_dir=(0, 0, -1), z_dir=(0, 1, 0)) * Cylinder(2.25, 60, mode=Mode.PRIVATE)
    add(chamfer2_piece_4)

    # Sketch10 → Boss-Extrude5 (add)
    with BuildSketch(Plane.XY.offset(70.5)):
        with Locations((0, 3.5)):
            Rectangle(SKETCH10_W, SKETCH10_H)
    boss_extrude5 = extrude(amount=BOSS_EXTRUDE5_DEPTH)

    # Sketch11 → Cut-Extrude5 (cut, through all)
    with BuildSketch(Plane(origin=(0, 7, 0), x_dir=(1, 0, 0), z_dir=(0, 1, 0))):
        with Locations(Location((0, -74.5, 0), (0, 0, 270))):
            Circle(SKETCH11_R)
    cut_extrude5 = extrude(amount=-CUT_EXTRUDE5_DEPTH, mode=Mode.SUBTRACT)

    # CirPattern1: Boss-Extrude5, Cut-Extrude5 ×4 about axis
    cirpattern1_axis = Axis((0, 0, 0), (0, 1, 0))
    add([boss_extrude5.rotate(cirpattern1_axis, i * 360 / CIRPATTERN1_COUNT) for i in range(1, CIRPATTERN1_COUNT)])
    add([cut_extrude5.rotate(cirpattern1_axis, i * 360 / CIRPATTERN1_COUNT) for i in range(1, CIRPATTERN1_COUNT)], mode=Mode.SUBTRACT)

    # Fillet1
    fillet1_edges = [part.edges().sort_by_distance(p)[0] for p in [
        (-4, 3.5, 70.5),
        (4, 3.5, 70.5),
        (-4, 3.5, 78.5),
        (4, 3.5, 78.5),
        (70.5, 3.5, 4),
        (70.5, 3.5, -4),
        (78.5, 3.5, 4),
        (78.5, 3.5, -4),
        (4, 3.5, -70.5),
        (-4, 3.5, -70.5),
        (4, 3.5, -78.5),
        (-4, 3.5, -78.5),
        (-70.5, 3.5, -4),
        (-70.5, 3.5, 4),
        (-78.5, 3.5, -4),
        (-78.5, 3.5, 4),
    ]]
    fillet(fillet1_edges, radius=FILLET1_R)

    # Sketch12 → Cut-Extrude6 (cut, up to next)
    with BuildSketch(Plane(origin=(70.5, 0, 0), x_dir=(0, 0, -1), z_dir=(1, 0, 0)), mode=Mode.PRIVATE) as cut_extrude6_sk1:
        with Locations((27.5, 16)):
            Rectangle(SKETCH12_W, SKETCH12_H)
    cut_extrude6_tool1 = extrude(cut_extrude6_sk1.sketch, amount=-CUT_EXTRUDE6_REACH, mode=Mode.PRIVATE) & part.part
    add(cut_extrude6_tool1.solids().sort_by_distance((70.5, 16, -27.5))[0], mode=Mode.SUBTRACT)

    # Fillet2
    fillet2_edges = [part.edges().sort_by_distance(p)[0] for p in [
        (70.5, 21, 70.5),
        (70.5, 21, -70.5),
        (-70.5, 21, -70.5),
        (-70.5, 21, 70.5),
    ]]
    fillet(fillet2_edges, radius=FILLET2_R)


solid = part.part
